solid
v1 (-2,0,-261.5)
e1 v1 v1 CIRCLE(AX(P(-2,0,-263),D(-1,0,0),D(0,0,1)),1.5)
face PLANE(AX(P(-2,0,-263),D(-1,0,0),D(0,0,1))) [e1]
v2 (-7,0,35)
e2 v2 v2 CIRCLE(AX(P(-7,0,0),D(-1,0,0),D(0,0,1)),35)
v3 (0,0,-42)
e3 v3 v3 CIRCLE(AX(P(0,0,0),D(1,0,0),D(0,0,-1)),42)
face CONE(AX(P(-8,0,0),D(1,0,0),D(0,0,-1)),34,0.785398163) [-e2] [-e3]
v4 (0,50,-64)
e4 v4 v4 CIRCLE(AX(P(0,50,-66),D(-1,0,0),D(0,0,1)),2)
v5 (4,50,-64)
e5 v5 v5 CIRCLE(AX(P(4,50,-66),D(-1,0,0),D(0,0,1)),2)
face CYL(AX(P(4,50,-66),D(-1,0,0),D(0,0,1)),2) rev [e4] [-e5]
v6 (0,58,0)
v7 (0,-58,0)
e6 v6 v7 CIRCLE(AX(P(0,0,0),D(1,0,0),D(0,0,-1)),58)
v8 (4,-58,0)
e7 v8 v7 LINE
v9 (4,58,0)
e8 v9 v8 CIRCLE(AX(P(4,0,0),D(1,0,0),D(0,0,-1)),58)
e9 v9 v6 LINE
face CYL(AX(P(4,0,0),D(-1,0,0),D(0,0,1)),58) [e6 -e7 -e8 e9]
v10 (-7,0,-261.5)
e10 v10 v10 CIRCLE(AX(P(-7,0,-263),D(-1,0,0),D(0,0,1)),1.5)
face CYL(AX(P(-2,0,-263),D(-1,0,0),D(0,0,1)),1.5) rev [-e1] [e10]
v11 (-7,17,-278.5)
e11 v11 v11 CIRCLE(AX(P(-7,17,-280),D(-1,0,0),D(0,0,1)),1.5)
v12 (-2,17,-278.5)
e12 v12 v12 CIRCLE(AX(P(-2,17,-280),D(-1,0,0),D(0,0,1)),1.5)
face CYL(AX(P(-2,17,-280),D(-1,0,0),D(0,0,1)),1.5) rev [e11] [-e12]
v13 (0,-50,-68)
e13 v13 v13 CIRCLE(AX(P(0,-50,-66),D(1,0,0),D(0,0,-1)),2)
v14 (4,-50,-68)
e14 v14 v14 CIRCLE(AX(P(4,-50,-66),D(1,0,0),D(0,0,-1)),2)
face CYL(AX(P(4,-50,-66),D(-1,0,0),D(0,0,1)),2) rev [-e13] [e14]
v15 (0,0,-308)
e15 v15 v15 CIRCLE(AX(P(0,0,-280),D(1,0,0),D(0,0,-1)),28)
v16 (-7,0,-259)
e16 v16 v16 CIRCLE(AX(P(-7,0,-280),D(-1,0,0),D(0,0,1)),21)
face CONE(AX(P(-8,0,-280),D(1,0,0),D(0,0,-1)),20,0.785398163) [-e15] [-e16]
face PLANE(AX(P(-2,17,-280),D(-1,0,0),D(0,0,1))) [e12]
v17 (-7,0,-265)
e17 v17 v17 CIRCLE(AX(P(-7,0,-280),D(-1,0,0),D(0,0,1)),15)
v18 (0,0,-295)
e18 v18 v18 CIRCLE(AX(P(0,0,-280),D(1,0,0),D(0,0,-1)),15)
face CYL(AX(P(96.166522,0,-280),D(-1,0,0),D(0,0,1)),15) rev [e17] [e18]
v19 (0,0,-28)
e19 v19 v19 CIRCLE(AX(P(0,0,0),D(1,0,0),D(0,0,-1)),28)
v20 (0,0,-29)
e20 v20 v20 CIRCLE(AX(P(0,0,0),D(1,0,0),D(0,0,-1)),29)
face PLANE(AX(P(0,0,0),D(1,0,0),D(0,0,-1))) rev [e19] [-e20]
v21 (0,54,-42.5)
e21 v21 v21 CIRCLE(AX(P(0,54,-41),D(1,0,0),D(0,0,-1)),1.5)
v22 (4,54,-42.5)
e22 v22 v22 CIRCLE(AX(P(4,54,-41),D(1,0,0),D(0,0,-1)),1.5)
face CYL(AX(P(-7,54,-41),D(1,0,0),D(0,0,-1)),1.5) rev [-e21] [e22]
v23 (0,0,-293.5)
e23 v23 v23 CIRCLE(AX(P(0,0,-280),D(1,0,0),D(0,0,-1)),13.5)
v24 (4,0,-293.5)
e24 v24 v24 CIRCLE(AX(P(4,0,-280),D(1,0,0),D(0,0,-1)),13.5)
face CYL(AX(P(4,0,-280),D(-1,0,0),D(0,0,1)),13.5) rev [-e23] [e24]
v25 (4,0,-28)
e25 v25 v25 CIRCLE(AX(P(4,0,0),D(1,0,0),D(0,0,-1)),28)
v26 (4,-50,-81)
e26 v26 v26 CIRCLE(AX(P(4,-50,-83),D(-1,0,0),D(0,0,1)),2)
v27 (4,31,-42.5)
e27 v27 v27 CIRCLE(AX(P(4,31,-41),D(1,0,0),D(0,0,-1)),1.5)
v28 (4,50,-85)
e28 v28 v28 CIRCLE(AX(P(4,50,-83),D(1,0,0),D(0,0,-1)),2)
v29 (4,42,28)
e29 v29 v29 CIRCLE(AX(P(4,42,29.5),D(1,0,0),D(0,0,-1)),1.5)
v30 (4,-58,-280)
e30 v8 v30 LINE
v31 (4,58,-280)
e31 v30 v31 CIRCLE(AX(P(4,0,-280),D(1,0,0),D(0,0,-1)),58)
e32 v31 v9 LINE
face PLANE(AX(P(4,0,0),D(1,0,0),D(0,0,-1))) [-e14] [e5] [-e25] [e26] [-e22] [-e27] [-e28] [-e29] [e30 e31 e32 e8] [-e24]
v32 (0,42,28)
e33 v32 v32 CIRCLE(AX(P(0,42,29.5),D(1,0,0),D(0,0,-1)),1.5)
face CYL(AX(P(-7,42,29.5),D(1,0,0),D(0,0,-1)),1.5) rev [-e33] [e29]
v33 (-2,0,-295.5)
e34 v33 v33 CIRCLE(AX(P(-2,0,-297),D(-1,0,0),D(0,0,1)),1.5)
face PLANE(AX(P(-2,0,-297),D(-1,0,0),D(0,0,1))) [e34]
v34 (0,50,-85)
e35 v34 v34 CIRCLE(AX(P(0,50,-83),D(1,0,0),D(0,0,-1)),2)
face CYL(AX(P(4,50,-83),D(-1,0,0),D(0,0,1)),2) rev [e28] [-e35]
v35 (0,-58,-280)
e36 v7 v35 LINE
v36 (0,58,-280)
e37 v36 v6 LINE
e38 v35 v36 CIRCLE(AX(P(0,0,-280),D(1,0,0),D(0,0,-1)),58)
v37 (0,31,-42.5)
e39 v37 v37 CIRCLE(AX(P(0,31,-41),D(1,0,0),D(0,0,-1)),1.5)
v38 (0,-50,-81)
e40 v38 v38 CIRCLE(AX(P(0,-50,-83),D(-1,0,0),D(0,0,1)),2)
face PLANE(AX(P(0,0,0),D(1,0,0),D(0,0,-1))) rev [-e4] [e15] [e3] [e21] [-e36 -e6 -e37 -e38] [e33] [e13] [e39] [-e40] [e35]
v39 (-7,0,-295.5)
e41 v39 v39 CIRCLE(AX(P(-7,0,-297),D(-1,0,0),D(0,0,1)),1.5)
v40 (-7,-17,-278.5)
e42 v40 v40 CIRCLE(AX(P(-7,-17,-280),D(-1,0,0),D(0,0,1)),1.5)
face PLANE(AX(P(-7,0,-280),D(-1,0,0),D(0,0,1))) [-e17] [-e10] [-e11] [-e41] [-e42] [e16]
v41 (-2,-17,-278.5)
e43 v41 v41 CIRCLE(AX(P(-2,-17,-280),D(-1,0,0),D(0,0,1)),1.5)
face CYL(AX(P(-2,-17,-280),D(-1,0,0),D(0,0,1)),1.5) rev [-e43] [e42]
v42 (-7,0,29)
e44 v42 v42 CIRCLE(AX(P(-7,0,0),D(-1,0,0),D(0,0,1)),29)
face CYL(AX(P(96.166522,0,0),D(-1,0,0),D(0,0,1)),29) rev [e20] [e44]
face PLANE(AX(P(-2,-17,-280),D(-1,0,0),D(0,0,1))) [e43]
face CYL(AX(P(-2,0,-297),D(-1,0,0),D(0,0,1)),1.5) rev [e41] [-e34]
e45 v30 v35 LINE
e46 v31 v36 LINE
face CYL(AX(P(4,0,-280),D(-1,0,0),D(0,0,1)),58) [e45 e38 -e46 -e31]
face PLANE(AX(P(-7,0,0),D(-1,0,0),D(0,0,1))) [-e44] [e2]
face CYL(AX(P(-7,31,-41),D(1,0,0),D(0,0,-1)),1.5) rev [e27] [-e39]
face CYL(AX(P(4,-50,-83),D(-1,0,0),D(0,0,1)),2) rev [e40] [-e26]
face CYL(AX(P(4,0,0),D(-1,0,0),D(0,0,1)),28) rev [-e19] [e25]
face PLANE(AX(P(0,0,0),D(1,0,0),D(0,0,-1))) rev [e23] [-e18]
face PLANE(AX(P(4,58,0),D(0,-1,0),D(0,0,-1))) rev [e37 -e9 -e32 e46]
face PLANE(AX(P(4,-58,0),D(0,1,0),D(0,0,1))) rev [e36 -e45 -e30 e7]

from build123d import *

# Parameters (mm, degrees)
SKETCH1_R           = 28
SKETCH1_R_2         = 13.5
BOSS_EXTRUDE1_DEPTH = 4
SKETCH2_R           = 34
SKETCH2_R_2         = 29
SKETCH2_R_3         = 20
SKETCH2_R_4         = 15
BOSS_EXTRUDE2_DEPTH = 7
CHAMFER1_SIZE       = 8
SKETCH3_R           = 2
CUT_EXTRUDE1_DEPTH  = 344.011661609
SKETCH4_R           = 1.5
CUT_EXTRUDE2_DEPTH  = 344.116598258
SKETCH5_R           = 1.5
CUT_EXTRUDE3_DEPTH  = 5


with BuildPart() as part:
    # Sketch1 → Boss-Extrude1 (new body)
    with BuildSketch(Plane(origin=(0, 0, 0), x_dir=(0, 0, -1), z_dir=(1, 0, 0))):
        with BuildLine():
            Line((0, 58), (280, 58))
            ThreePointArc((280, 58), (338, 0), (280, -58))
            Line((280, -58), (0, -58))
            ThreePointArc((0, -58), (-58, 0), (0, 58))
        make_face()
        Circle(SKETCH1_R, mode=Mode.SUBTRACT)
        with Locations((280, 0)):
            Circle(SKETCH1_R_2, mode=Mode.SUBTRACT)
    extrude(amount=BOSS_EXTRUDE1_DEPTH)

    # Sketch2 → Boss-Extrude2 (add)
    # profile 1 of 2: a face of its own
    with BuildSketch(Plane.ZY.offset(7)):
        Circle(SKETCH2_R)
        Circle(SKETCH2_R_2, mode=Mode.SUBTRACT)
    # profile 2 of 2: a face of its own
    with BuildSketch(Plane.ZY.offset(7)):
        with Locations((-280, 0)):
            Circle(SKETCH2_R_3)
        with Locations((-280, 0)):
            Circle(SKETCH2_R_4, mode=Mode.SUBTRACT)
    extrude(amount=-BOSS_EXTRUDE2_DEPTH)

    # Chamfer1
    # the kernel refuses this chamfer: 8 mm, written as the material it adds along each edge
    with BuildSketch(Plane(origin=(0, 0, 0), x_dir=(0, 0, 1), z_dir=(0, -1, 0))) as chamfer1_piece_1_section:
        Polygon((34 + CHAMFER1_SIZE, 0), (34, CHAMFER1_SIZE), (34, 0), align=None)
    chamfer1_piece_1 = revolve(axis=Axis((0, 0, 0), (-1, 0, 0)), mode=Mode.PRIVATE)
    chamfer1_piece_1 = split(chamfer1_piece_1, bisect_by=Plane(origin=(-7, 0, -38.472213865), z_dir=(1, 0, 0)), keep=Keep.TOP, mode=Mode.PRIVATE)
    add(chamfer1_piece_1)
    with BuildSketch(Plane(origin=(0, 0, -280), x_dir=(0, 0, 1), z_dir=(0, -1, 0))) as chamfer1_piece_2_section:
        Polygon((20 + CHAMFER1_SIZE, 0), (20, CHAMFER1_SIZE), (20, 0), align=None)
    chamfer1_piece_2 = revolve(axis=Axis((0, 0, -280), (-1, 0, 0)), mode=Mode.PRIVATE)
    chamfer1_piece_2 = split(chamfer1_piece_2, bisect_by=Plane(origin=(-7, 0, -304.493064149), z_dir=(1, 0, 0)), keep=Keep.TOP, mode=Mode.PRIVATE)
    add(chamfer1_piece_2)

    # Sketch3 → Cut-Extrude1 (cut, through all)
    with BuildSketch(Plane.ZY):
        with Locations((-66, 50)):
            Circle(SKETCH3_R)
        with Locations(Location((-66, -50, 0), (0, 0, 180))):
            Circle(SKETCH3_R)
        with Locations((-83, -50)):
            Circle(SKETCH3_R)
        with Locations(Location((-83, 50, 0), (0, 0, 180))):
            Circle(SKETCH3_R)
    extrude(amount=-CUT_EXTRUDE1_DEPTH, mode=Mode.SUBTRACT)

    # Sketch4 → Cut-Extrude2 (cut, through all)
    with BuildSketch(Plane(origin=(4, 0, 0), x_dir=(0, 0, -1), z_dir=(1, 0, 0))):
        with Locations((-29.5, 42)):
            Circle(SKETCH4_R)
        with Locations((41, 54)):
            Circle(SKETCH4_R)
        with Locations((41, 31)):
            Circle(SKETCH4_R)
    extrude(amount=-CUT_EXTRUDE2_DEPTH, mode=Mode.SUBTRACT)

    # Sketch5 → Cut-Extrude3 (cut)
    with BuildSketch(Plane.ZY.offset(7)):
        with Locations((-280, 17)):
            Circle(SKETCH5_R)
        with Locations((-263, 0)):
            Circle(SKETCH5_R)
        with Locations((-280, -17)):
            Circle(SKETCH5_R)
        with Locations((-297, 0)):
            Circle(SKETCH5_R)
    extrude(amount=-CUT_EXTRUDE3_DEPTH, mode=Mode.SUBTRACT)


solid = part.part
